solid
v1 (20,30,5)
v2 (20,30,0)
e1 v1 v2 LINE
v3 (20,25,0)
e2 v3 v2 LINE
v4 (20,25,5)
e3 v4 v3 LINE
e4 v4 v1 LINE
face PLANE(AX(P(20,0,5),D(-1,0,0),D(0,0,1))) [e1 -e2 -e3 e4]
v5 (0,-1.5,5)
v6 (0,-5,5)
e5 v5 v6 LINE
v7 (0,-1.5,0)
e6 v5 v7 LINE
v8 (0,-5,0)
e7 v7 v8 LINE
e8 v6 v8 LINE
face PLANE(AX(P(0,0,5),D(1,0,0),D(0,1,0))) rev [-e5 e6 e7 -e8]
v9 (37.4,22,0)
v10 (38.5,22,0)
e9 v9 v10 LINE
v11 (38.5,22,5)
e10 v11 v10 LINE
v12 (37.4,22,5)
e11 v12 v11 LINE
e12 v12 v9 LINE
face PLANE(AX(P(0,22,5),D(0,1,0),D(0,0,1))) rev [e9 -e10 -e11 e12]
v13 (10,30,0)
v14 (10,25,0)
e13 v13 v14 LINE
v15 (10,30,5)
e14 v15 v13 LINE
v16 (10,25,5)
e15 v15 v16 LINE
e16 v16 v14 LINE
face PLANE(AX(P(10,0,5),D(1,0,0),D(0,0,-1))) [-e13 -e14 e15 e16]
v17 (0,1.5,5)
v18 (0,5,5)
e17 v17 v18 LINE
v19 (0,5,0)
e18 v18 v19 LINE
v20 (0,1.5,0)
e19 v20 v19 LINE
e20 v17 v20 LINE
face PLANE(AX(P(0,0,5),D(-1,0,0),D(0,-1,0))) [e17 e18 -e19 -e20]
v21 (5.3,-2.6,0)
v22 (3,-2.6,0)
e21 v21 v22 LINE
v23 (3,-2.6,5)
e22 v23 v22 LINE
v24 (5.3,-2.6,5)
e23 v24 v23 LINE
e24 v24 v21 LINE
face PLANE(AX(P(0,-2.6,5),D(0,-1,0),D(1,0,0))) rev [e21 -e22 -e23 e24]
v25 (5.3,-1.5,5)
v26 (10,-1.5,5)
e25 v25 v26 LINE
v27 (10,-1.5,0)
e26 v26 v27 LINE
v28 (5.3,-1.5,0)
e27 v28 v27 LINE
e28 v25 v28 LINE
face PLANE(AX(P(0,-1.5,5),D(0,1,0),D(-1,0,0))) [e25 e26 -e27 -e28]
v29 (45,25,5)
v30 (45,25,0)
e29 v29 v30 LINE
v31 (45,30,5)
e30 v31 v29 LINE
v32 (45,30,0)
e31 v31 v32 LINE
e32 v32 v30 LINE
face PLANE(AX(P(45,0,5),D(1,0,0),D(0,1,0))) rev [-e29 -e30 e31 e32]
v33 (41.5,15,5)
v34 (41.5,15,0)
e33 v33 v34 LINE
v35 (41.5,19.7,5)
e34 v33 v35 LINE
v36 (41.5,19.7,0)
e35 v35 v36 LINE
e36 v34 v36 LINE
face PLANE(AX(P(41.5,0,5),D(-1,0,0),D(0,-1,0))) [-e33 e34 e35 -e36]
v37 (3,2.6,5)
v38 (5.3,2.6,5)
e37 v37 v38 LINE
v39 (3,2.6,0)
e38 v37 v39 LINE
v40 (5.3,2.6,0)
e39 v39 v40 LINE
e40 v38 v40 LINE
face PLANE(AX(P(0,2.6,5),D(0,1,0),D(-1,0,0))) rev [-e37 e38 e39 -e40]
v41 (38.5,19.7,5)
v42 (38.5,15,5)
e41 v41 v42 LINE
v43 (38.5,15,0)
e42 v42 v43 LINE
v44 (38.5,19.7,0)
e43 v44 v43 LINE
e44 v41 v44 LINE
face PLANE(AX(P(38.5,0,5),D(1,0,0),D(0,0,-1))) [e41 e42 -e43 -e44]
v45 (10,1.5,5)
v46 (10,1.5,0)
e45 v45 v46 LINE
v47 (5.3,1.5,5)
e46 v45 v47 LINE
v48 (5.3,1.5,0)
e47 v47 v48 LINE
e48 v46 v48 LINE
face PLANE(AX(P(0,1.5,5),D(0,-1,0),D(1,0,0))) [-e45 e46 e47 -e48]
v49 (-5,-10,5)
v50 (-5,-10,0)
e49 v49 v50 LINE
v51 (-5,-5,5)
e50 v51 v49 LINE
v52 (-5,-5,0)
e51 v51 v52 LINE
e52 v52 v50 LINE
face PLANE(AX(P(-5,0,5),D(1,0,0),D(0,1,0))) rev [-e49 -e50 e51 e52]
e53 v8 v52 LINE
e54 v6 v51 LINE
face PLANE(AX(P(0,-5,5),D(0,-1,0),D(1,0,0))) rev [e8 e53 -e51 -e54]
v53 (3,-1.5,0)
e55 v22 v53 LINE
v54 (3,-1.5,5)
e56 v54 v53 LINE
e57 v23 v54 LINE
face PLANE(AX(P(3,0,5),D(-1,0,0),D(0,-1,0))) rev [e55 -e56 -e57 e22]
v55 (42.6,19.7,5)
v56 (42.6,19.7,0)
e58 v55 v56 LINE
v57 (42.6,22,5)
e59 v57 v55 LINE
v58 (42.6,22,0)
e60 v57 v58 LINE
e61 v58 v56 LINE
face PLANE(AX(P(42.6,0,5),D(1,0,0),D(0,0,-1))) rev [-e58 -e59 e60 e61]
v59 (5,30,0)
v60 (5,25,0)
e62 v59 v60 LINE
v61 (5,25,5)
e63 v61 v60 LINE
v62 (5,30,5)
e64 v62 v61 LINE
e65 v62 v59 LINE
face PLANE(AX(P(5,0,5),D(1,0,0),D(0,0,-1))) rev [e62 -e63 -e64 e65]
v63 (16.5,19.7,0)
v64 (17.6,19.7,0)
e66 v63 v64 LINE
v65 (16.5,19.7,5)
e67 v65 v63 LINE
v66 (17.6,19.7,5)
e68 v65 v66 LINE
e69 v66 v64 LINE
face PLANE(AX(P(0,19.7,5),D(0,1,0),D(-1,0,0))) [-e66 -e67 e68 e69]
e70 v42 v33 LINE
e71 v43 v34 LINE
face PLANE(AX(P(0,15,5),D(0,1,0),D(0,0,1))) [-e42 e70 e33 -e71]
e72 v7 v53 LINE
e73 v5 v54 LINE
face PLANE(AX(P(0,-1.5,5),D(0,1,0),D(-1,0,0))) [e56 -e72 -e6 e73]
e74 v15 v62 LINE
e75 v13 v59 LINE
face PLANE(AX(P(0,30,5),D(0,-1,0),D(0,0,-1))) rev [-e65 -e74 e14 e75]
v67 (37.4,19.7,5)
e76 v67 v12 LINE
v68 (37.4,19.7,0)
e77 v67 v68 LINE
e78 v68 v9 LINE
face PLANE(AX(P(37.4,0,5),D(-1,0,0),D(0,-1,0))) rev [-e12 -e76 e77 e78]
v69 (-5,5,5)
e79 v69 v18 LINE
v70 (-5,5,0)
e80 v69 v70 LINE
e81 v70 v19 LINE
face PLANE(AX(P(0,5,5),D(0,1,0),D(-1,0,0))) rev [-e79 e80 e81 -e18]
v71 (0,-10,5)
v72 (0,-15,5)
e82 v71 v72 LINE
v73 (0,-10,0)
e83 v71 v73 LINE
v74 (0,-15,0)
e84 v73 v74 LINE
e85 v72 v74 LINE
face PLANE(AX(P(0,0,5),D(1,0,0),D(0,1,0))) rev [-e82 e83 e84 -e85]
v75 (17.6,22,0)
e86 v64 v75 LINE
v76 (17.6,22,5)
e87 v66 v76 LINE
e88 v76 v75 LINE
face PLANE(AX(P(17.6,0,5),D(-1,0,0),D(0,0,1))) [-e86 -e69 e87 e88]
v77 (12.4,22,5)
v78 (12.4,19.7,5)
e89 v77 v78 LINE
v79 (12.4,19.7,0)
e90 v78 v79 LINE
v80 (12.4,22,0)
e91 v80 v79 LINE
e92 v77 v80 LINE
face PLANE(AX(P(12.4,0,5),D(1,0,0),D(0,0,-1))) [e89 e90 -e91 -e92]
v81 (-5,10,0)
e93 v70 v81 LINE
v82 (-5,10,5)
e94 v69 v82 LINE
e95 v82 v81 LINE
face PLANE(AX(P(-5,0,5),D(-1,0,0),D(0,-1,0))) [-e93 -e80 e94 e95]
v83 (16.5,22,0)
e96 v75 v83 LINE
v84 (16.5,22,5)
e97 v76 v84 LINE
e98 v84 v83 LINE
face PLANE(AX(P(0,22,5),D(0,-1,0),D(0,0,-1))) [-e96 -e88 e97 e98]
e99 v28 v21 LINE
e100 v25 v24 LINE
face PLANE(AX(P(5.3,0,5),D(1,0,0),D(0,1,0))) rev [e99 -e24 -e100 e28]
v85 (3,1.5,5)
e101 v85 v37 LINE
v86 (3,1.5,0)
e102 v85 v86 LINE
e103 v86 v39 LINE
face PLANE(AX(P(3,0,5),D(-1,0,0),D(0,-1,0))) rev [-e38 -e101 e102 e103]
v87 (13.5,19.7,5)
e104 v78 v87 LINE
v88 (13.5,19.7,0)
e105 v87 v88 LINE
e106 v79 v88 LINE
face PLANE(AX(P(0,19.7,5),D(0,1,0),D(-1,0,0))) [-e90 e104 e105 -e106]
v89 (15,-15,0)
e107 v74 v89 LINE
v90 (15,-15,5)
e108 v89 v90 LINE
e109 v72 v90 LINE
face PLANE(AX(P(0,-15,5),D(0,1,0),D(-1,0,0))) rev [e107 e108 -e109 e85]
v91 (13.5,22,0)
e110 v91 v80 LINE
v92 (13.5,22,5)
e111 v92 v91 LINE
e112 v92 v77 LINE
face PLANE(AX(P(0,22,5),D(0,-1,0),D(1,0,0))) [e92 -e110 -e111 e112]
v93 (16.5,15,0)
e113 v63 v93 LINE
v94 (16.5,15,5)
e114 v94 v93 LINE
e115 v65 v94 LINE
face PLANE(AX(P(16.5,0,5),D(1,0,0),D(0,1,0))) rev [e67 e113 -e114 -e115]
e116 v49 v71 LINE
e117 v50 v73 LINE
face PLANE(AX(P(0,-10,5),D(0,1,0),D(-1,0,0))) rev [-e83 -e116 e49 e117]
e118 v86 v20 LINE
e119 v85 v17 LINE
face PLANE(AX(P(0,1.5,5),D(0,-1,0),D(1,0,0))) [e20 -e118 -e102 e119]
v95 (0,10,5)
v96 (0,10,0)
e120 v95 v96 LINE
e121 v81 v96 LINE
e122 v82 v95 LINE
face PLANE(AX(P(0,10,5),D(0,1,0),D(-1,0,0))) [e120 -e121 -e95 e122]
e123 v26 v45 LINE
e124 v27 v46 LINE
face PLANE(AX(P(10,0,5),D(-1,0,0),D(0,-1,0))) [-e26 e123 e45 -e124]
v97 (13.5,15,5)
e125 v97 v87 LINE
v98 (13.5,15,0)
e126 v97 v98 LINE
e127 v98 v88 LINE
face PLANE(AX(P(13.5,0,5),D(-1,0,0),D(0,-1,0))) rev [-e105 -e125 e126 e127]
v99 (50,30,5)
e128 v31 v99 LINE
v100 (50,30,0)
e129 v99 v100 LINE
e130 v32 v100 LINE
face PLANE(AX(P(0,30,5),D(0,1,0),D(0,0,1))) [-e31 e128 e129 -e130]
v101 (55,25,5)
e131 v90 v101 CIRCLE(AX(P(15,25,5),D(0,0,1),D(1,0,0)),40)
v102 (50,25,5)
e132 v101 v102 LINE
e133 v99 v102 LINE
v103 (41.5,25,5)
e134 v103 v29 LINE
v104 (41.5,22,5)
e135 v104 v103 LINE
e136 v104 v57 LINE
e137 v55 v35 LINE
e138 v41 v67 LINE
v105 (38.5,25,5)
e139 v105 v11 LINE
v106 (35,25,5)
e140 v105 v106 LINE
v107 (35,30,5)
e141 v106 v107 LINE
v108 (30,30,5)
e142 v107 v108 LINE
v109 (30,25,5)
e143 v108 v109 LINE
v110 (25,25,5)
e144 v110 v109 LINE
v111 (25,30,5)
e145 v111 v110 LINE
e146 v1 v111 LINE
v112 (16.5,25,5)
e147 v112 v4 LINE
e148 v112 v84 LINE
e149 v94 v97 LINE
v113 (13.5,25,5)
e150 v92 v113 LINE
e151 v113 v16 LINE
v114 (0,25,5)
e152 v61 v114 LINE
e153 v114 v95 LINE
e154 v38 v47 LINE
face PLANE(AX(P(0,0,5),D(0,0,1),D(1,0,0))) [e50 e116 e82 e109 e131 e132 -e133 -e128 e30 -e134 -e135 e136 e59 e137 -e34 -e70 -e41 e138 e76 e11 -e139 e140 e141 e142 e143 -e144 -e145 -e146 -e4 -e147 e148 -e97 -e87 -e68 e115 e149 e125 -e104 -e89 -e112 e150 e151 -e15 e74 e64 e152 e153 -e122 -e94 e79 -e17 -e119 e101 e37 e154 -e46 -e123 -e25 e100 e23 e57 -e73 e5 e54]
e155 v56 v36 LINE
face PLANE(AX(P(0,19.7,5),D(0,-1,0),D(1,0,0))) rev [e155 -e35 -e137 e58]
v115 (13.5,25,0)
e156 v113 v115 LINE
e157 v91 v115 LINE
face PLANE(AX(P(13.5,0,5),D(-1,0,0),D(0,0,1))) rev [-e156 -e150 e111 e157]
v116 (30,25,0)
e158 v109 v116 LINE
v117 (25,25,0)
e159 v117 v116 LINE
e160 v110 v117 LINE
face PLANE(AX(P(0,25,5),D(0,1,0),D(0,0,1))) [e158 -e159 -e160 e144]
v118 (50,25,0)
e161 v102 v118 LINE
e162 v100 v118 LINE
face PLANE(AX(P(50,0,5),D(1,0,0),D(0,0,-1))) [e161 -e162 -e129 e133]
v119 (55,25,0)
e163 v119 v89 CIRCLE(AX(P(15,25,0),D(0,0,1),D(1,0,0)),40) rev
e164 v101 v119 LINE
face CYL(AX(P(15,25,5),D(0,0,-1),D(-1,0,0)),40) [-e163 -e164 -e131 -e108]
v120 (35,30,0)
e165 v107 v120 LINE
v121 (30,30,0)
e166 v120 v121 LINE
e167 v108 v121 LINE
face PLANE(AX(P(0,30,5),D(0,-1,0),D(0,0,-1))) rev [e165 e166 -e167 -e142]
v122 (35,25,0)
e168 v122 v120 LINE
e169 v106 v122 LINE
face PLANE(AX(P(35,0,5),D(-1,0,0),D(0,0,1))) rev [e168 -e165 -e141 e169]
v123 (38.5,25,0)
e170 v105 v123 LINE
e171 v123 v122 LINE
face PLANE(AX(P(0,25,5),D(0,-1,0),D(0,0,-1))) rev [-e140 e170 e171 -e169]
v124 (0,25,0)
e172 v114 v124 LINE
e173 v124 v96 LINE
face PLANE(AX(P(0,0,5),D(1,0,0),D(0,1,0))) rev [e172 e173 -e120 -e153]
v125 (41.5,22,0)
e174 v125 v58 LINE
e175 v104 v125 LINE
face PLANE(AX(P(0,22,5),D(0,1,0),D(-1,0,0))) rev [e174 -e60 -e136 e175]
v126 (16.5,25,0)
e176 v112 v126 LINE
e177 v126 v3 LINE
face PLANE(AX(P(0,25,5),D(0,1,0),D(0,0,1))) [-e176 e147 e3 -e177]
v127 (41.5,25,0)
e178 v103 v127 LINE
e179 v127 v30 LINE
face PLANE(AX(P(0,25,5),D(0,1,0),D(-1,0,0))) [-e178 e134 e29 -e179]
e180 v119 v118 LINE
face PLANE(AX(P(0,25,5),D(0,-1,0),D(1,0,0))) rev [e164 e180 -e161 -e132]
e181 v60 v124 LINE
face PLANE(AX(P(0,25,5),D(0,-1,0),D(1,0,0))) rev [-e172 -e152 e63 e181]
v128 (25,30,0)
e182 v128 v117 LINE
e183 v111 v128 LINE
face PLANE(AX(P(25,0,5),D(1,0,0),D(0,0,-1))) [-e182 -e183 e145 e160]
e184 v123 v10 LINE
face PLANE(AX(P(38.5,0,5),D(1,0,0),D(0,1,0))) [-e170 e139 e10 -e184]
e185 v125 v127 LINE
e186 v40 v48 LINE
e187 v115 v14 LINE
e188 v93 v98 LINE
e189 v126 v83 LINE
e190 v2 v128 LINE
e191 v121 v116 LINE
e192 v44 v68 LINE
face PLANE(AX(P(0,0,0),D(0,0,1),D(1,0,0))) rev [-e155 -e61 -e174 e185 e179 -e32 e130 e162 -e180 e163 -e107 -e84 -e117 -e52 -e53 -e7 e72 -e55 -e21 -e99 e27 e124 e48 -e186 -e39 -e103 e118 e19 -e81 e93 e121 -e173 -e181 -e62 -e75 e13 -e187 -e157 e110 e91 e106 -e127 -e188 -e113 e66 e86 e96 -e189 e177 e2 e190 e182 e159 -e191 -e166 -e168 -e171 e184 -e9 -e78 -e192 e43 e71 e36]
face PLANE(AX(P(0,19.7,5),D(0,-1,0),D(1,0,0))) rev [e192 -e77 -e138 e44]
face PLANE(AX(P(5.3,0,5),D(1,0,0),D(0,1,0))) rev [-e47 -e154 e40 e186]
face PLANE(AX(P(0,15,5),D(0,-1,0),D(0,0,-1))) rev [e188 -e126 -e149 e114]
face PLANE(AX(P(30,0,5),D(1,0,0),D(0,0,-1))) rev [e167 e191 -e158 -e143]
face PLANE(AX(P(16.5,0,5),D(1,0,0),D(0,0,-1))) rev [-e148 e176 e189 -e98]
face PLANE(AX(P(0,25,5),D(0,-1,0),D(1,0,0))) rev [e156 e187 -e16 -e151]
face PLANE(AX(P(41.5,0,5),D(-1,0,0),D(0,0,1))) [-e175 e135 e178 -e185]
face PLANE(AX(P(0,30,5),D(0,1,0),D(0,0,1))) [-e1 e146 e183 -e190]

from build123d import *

# Parameters (mm, degrees)
BOSS_EXTRU_1_DEPTH = 5
CONG_1_R           = 40


with BuildPart() as part:
    # Esquisse1 → Boss.-Extru.1 (new body)
    with BuildSketch(Plane.XY):
        Polygon((0, 25), (0, 10), (-5, 10), (-5, 5), (0, 5), (0, 1.5), (3, 1.5), (3, 2.6), (5.3, 2.6), (5.3, 1.5), (10, 1.5), (10, -1.5), (5.3, -1.5), (5.3, -2.6), (3, -2.6), (3, -1.5), (0, -1.5), (0, -5), (-5, -5), (-5, -10), (0, -10), (0, -15), (55, -15), (55, 25), (50, 25), (50, 30), (45, 30), (45, 25), (41.5, 25), (41.5, 22), (42.6, 22), (42.6, 19.7), (41.5, 19.7), (41.5, 15), (38.5, 15), (38.5, 19.7), (37.4, 19.7), (37.4, 22), (38.5, 22), (38.5, 25), (35, 25), (35, 30), (30, 30), (30, 25), (25, 25), (25, 30), (20, 30), (20, 25), (16.5, 25), (16.5, 22), (17.6, 22), (17.6, 19.7), (16.5, 19.7), (16.5, 15), (13.5, 15), (13.5, 19.7), (12.4, 19.7), (12.4, 22), (13.5, 22), (13.5, 25), (10, 25), (10, 30), (5, 30), (5, 25), align=None)
    extrude(amount=BOSS_EXTRU_1_DEPTH)

    # Congé1
    cong_1_edges = [part.edges().sort_by_distance(p)[0] for p in [
        (55, -15, 2.5),
    ]]
    fillet(cong_1_edges, radius=CONG_1_R - 0.0001)  # a hair under: the kernel refuses the full size


solid = part.part
